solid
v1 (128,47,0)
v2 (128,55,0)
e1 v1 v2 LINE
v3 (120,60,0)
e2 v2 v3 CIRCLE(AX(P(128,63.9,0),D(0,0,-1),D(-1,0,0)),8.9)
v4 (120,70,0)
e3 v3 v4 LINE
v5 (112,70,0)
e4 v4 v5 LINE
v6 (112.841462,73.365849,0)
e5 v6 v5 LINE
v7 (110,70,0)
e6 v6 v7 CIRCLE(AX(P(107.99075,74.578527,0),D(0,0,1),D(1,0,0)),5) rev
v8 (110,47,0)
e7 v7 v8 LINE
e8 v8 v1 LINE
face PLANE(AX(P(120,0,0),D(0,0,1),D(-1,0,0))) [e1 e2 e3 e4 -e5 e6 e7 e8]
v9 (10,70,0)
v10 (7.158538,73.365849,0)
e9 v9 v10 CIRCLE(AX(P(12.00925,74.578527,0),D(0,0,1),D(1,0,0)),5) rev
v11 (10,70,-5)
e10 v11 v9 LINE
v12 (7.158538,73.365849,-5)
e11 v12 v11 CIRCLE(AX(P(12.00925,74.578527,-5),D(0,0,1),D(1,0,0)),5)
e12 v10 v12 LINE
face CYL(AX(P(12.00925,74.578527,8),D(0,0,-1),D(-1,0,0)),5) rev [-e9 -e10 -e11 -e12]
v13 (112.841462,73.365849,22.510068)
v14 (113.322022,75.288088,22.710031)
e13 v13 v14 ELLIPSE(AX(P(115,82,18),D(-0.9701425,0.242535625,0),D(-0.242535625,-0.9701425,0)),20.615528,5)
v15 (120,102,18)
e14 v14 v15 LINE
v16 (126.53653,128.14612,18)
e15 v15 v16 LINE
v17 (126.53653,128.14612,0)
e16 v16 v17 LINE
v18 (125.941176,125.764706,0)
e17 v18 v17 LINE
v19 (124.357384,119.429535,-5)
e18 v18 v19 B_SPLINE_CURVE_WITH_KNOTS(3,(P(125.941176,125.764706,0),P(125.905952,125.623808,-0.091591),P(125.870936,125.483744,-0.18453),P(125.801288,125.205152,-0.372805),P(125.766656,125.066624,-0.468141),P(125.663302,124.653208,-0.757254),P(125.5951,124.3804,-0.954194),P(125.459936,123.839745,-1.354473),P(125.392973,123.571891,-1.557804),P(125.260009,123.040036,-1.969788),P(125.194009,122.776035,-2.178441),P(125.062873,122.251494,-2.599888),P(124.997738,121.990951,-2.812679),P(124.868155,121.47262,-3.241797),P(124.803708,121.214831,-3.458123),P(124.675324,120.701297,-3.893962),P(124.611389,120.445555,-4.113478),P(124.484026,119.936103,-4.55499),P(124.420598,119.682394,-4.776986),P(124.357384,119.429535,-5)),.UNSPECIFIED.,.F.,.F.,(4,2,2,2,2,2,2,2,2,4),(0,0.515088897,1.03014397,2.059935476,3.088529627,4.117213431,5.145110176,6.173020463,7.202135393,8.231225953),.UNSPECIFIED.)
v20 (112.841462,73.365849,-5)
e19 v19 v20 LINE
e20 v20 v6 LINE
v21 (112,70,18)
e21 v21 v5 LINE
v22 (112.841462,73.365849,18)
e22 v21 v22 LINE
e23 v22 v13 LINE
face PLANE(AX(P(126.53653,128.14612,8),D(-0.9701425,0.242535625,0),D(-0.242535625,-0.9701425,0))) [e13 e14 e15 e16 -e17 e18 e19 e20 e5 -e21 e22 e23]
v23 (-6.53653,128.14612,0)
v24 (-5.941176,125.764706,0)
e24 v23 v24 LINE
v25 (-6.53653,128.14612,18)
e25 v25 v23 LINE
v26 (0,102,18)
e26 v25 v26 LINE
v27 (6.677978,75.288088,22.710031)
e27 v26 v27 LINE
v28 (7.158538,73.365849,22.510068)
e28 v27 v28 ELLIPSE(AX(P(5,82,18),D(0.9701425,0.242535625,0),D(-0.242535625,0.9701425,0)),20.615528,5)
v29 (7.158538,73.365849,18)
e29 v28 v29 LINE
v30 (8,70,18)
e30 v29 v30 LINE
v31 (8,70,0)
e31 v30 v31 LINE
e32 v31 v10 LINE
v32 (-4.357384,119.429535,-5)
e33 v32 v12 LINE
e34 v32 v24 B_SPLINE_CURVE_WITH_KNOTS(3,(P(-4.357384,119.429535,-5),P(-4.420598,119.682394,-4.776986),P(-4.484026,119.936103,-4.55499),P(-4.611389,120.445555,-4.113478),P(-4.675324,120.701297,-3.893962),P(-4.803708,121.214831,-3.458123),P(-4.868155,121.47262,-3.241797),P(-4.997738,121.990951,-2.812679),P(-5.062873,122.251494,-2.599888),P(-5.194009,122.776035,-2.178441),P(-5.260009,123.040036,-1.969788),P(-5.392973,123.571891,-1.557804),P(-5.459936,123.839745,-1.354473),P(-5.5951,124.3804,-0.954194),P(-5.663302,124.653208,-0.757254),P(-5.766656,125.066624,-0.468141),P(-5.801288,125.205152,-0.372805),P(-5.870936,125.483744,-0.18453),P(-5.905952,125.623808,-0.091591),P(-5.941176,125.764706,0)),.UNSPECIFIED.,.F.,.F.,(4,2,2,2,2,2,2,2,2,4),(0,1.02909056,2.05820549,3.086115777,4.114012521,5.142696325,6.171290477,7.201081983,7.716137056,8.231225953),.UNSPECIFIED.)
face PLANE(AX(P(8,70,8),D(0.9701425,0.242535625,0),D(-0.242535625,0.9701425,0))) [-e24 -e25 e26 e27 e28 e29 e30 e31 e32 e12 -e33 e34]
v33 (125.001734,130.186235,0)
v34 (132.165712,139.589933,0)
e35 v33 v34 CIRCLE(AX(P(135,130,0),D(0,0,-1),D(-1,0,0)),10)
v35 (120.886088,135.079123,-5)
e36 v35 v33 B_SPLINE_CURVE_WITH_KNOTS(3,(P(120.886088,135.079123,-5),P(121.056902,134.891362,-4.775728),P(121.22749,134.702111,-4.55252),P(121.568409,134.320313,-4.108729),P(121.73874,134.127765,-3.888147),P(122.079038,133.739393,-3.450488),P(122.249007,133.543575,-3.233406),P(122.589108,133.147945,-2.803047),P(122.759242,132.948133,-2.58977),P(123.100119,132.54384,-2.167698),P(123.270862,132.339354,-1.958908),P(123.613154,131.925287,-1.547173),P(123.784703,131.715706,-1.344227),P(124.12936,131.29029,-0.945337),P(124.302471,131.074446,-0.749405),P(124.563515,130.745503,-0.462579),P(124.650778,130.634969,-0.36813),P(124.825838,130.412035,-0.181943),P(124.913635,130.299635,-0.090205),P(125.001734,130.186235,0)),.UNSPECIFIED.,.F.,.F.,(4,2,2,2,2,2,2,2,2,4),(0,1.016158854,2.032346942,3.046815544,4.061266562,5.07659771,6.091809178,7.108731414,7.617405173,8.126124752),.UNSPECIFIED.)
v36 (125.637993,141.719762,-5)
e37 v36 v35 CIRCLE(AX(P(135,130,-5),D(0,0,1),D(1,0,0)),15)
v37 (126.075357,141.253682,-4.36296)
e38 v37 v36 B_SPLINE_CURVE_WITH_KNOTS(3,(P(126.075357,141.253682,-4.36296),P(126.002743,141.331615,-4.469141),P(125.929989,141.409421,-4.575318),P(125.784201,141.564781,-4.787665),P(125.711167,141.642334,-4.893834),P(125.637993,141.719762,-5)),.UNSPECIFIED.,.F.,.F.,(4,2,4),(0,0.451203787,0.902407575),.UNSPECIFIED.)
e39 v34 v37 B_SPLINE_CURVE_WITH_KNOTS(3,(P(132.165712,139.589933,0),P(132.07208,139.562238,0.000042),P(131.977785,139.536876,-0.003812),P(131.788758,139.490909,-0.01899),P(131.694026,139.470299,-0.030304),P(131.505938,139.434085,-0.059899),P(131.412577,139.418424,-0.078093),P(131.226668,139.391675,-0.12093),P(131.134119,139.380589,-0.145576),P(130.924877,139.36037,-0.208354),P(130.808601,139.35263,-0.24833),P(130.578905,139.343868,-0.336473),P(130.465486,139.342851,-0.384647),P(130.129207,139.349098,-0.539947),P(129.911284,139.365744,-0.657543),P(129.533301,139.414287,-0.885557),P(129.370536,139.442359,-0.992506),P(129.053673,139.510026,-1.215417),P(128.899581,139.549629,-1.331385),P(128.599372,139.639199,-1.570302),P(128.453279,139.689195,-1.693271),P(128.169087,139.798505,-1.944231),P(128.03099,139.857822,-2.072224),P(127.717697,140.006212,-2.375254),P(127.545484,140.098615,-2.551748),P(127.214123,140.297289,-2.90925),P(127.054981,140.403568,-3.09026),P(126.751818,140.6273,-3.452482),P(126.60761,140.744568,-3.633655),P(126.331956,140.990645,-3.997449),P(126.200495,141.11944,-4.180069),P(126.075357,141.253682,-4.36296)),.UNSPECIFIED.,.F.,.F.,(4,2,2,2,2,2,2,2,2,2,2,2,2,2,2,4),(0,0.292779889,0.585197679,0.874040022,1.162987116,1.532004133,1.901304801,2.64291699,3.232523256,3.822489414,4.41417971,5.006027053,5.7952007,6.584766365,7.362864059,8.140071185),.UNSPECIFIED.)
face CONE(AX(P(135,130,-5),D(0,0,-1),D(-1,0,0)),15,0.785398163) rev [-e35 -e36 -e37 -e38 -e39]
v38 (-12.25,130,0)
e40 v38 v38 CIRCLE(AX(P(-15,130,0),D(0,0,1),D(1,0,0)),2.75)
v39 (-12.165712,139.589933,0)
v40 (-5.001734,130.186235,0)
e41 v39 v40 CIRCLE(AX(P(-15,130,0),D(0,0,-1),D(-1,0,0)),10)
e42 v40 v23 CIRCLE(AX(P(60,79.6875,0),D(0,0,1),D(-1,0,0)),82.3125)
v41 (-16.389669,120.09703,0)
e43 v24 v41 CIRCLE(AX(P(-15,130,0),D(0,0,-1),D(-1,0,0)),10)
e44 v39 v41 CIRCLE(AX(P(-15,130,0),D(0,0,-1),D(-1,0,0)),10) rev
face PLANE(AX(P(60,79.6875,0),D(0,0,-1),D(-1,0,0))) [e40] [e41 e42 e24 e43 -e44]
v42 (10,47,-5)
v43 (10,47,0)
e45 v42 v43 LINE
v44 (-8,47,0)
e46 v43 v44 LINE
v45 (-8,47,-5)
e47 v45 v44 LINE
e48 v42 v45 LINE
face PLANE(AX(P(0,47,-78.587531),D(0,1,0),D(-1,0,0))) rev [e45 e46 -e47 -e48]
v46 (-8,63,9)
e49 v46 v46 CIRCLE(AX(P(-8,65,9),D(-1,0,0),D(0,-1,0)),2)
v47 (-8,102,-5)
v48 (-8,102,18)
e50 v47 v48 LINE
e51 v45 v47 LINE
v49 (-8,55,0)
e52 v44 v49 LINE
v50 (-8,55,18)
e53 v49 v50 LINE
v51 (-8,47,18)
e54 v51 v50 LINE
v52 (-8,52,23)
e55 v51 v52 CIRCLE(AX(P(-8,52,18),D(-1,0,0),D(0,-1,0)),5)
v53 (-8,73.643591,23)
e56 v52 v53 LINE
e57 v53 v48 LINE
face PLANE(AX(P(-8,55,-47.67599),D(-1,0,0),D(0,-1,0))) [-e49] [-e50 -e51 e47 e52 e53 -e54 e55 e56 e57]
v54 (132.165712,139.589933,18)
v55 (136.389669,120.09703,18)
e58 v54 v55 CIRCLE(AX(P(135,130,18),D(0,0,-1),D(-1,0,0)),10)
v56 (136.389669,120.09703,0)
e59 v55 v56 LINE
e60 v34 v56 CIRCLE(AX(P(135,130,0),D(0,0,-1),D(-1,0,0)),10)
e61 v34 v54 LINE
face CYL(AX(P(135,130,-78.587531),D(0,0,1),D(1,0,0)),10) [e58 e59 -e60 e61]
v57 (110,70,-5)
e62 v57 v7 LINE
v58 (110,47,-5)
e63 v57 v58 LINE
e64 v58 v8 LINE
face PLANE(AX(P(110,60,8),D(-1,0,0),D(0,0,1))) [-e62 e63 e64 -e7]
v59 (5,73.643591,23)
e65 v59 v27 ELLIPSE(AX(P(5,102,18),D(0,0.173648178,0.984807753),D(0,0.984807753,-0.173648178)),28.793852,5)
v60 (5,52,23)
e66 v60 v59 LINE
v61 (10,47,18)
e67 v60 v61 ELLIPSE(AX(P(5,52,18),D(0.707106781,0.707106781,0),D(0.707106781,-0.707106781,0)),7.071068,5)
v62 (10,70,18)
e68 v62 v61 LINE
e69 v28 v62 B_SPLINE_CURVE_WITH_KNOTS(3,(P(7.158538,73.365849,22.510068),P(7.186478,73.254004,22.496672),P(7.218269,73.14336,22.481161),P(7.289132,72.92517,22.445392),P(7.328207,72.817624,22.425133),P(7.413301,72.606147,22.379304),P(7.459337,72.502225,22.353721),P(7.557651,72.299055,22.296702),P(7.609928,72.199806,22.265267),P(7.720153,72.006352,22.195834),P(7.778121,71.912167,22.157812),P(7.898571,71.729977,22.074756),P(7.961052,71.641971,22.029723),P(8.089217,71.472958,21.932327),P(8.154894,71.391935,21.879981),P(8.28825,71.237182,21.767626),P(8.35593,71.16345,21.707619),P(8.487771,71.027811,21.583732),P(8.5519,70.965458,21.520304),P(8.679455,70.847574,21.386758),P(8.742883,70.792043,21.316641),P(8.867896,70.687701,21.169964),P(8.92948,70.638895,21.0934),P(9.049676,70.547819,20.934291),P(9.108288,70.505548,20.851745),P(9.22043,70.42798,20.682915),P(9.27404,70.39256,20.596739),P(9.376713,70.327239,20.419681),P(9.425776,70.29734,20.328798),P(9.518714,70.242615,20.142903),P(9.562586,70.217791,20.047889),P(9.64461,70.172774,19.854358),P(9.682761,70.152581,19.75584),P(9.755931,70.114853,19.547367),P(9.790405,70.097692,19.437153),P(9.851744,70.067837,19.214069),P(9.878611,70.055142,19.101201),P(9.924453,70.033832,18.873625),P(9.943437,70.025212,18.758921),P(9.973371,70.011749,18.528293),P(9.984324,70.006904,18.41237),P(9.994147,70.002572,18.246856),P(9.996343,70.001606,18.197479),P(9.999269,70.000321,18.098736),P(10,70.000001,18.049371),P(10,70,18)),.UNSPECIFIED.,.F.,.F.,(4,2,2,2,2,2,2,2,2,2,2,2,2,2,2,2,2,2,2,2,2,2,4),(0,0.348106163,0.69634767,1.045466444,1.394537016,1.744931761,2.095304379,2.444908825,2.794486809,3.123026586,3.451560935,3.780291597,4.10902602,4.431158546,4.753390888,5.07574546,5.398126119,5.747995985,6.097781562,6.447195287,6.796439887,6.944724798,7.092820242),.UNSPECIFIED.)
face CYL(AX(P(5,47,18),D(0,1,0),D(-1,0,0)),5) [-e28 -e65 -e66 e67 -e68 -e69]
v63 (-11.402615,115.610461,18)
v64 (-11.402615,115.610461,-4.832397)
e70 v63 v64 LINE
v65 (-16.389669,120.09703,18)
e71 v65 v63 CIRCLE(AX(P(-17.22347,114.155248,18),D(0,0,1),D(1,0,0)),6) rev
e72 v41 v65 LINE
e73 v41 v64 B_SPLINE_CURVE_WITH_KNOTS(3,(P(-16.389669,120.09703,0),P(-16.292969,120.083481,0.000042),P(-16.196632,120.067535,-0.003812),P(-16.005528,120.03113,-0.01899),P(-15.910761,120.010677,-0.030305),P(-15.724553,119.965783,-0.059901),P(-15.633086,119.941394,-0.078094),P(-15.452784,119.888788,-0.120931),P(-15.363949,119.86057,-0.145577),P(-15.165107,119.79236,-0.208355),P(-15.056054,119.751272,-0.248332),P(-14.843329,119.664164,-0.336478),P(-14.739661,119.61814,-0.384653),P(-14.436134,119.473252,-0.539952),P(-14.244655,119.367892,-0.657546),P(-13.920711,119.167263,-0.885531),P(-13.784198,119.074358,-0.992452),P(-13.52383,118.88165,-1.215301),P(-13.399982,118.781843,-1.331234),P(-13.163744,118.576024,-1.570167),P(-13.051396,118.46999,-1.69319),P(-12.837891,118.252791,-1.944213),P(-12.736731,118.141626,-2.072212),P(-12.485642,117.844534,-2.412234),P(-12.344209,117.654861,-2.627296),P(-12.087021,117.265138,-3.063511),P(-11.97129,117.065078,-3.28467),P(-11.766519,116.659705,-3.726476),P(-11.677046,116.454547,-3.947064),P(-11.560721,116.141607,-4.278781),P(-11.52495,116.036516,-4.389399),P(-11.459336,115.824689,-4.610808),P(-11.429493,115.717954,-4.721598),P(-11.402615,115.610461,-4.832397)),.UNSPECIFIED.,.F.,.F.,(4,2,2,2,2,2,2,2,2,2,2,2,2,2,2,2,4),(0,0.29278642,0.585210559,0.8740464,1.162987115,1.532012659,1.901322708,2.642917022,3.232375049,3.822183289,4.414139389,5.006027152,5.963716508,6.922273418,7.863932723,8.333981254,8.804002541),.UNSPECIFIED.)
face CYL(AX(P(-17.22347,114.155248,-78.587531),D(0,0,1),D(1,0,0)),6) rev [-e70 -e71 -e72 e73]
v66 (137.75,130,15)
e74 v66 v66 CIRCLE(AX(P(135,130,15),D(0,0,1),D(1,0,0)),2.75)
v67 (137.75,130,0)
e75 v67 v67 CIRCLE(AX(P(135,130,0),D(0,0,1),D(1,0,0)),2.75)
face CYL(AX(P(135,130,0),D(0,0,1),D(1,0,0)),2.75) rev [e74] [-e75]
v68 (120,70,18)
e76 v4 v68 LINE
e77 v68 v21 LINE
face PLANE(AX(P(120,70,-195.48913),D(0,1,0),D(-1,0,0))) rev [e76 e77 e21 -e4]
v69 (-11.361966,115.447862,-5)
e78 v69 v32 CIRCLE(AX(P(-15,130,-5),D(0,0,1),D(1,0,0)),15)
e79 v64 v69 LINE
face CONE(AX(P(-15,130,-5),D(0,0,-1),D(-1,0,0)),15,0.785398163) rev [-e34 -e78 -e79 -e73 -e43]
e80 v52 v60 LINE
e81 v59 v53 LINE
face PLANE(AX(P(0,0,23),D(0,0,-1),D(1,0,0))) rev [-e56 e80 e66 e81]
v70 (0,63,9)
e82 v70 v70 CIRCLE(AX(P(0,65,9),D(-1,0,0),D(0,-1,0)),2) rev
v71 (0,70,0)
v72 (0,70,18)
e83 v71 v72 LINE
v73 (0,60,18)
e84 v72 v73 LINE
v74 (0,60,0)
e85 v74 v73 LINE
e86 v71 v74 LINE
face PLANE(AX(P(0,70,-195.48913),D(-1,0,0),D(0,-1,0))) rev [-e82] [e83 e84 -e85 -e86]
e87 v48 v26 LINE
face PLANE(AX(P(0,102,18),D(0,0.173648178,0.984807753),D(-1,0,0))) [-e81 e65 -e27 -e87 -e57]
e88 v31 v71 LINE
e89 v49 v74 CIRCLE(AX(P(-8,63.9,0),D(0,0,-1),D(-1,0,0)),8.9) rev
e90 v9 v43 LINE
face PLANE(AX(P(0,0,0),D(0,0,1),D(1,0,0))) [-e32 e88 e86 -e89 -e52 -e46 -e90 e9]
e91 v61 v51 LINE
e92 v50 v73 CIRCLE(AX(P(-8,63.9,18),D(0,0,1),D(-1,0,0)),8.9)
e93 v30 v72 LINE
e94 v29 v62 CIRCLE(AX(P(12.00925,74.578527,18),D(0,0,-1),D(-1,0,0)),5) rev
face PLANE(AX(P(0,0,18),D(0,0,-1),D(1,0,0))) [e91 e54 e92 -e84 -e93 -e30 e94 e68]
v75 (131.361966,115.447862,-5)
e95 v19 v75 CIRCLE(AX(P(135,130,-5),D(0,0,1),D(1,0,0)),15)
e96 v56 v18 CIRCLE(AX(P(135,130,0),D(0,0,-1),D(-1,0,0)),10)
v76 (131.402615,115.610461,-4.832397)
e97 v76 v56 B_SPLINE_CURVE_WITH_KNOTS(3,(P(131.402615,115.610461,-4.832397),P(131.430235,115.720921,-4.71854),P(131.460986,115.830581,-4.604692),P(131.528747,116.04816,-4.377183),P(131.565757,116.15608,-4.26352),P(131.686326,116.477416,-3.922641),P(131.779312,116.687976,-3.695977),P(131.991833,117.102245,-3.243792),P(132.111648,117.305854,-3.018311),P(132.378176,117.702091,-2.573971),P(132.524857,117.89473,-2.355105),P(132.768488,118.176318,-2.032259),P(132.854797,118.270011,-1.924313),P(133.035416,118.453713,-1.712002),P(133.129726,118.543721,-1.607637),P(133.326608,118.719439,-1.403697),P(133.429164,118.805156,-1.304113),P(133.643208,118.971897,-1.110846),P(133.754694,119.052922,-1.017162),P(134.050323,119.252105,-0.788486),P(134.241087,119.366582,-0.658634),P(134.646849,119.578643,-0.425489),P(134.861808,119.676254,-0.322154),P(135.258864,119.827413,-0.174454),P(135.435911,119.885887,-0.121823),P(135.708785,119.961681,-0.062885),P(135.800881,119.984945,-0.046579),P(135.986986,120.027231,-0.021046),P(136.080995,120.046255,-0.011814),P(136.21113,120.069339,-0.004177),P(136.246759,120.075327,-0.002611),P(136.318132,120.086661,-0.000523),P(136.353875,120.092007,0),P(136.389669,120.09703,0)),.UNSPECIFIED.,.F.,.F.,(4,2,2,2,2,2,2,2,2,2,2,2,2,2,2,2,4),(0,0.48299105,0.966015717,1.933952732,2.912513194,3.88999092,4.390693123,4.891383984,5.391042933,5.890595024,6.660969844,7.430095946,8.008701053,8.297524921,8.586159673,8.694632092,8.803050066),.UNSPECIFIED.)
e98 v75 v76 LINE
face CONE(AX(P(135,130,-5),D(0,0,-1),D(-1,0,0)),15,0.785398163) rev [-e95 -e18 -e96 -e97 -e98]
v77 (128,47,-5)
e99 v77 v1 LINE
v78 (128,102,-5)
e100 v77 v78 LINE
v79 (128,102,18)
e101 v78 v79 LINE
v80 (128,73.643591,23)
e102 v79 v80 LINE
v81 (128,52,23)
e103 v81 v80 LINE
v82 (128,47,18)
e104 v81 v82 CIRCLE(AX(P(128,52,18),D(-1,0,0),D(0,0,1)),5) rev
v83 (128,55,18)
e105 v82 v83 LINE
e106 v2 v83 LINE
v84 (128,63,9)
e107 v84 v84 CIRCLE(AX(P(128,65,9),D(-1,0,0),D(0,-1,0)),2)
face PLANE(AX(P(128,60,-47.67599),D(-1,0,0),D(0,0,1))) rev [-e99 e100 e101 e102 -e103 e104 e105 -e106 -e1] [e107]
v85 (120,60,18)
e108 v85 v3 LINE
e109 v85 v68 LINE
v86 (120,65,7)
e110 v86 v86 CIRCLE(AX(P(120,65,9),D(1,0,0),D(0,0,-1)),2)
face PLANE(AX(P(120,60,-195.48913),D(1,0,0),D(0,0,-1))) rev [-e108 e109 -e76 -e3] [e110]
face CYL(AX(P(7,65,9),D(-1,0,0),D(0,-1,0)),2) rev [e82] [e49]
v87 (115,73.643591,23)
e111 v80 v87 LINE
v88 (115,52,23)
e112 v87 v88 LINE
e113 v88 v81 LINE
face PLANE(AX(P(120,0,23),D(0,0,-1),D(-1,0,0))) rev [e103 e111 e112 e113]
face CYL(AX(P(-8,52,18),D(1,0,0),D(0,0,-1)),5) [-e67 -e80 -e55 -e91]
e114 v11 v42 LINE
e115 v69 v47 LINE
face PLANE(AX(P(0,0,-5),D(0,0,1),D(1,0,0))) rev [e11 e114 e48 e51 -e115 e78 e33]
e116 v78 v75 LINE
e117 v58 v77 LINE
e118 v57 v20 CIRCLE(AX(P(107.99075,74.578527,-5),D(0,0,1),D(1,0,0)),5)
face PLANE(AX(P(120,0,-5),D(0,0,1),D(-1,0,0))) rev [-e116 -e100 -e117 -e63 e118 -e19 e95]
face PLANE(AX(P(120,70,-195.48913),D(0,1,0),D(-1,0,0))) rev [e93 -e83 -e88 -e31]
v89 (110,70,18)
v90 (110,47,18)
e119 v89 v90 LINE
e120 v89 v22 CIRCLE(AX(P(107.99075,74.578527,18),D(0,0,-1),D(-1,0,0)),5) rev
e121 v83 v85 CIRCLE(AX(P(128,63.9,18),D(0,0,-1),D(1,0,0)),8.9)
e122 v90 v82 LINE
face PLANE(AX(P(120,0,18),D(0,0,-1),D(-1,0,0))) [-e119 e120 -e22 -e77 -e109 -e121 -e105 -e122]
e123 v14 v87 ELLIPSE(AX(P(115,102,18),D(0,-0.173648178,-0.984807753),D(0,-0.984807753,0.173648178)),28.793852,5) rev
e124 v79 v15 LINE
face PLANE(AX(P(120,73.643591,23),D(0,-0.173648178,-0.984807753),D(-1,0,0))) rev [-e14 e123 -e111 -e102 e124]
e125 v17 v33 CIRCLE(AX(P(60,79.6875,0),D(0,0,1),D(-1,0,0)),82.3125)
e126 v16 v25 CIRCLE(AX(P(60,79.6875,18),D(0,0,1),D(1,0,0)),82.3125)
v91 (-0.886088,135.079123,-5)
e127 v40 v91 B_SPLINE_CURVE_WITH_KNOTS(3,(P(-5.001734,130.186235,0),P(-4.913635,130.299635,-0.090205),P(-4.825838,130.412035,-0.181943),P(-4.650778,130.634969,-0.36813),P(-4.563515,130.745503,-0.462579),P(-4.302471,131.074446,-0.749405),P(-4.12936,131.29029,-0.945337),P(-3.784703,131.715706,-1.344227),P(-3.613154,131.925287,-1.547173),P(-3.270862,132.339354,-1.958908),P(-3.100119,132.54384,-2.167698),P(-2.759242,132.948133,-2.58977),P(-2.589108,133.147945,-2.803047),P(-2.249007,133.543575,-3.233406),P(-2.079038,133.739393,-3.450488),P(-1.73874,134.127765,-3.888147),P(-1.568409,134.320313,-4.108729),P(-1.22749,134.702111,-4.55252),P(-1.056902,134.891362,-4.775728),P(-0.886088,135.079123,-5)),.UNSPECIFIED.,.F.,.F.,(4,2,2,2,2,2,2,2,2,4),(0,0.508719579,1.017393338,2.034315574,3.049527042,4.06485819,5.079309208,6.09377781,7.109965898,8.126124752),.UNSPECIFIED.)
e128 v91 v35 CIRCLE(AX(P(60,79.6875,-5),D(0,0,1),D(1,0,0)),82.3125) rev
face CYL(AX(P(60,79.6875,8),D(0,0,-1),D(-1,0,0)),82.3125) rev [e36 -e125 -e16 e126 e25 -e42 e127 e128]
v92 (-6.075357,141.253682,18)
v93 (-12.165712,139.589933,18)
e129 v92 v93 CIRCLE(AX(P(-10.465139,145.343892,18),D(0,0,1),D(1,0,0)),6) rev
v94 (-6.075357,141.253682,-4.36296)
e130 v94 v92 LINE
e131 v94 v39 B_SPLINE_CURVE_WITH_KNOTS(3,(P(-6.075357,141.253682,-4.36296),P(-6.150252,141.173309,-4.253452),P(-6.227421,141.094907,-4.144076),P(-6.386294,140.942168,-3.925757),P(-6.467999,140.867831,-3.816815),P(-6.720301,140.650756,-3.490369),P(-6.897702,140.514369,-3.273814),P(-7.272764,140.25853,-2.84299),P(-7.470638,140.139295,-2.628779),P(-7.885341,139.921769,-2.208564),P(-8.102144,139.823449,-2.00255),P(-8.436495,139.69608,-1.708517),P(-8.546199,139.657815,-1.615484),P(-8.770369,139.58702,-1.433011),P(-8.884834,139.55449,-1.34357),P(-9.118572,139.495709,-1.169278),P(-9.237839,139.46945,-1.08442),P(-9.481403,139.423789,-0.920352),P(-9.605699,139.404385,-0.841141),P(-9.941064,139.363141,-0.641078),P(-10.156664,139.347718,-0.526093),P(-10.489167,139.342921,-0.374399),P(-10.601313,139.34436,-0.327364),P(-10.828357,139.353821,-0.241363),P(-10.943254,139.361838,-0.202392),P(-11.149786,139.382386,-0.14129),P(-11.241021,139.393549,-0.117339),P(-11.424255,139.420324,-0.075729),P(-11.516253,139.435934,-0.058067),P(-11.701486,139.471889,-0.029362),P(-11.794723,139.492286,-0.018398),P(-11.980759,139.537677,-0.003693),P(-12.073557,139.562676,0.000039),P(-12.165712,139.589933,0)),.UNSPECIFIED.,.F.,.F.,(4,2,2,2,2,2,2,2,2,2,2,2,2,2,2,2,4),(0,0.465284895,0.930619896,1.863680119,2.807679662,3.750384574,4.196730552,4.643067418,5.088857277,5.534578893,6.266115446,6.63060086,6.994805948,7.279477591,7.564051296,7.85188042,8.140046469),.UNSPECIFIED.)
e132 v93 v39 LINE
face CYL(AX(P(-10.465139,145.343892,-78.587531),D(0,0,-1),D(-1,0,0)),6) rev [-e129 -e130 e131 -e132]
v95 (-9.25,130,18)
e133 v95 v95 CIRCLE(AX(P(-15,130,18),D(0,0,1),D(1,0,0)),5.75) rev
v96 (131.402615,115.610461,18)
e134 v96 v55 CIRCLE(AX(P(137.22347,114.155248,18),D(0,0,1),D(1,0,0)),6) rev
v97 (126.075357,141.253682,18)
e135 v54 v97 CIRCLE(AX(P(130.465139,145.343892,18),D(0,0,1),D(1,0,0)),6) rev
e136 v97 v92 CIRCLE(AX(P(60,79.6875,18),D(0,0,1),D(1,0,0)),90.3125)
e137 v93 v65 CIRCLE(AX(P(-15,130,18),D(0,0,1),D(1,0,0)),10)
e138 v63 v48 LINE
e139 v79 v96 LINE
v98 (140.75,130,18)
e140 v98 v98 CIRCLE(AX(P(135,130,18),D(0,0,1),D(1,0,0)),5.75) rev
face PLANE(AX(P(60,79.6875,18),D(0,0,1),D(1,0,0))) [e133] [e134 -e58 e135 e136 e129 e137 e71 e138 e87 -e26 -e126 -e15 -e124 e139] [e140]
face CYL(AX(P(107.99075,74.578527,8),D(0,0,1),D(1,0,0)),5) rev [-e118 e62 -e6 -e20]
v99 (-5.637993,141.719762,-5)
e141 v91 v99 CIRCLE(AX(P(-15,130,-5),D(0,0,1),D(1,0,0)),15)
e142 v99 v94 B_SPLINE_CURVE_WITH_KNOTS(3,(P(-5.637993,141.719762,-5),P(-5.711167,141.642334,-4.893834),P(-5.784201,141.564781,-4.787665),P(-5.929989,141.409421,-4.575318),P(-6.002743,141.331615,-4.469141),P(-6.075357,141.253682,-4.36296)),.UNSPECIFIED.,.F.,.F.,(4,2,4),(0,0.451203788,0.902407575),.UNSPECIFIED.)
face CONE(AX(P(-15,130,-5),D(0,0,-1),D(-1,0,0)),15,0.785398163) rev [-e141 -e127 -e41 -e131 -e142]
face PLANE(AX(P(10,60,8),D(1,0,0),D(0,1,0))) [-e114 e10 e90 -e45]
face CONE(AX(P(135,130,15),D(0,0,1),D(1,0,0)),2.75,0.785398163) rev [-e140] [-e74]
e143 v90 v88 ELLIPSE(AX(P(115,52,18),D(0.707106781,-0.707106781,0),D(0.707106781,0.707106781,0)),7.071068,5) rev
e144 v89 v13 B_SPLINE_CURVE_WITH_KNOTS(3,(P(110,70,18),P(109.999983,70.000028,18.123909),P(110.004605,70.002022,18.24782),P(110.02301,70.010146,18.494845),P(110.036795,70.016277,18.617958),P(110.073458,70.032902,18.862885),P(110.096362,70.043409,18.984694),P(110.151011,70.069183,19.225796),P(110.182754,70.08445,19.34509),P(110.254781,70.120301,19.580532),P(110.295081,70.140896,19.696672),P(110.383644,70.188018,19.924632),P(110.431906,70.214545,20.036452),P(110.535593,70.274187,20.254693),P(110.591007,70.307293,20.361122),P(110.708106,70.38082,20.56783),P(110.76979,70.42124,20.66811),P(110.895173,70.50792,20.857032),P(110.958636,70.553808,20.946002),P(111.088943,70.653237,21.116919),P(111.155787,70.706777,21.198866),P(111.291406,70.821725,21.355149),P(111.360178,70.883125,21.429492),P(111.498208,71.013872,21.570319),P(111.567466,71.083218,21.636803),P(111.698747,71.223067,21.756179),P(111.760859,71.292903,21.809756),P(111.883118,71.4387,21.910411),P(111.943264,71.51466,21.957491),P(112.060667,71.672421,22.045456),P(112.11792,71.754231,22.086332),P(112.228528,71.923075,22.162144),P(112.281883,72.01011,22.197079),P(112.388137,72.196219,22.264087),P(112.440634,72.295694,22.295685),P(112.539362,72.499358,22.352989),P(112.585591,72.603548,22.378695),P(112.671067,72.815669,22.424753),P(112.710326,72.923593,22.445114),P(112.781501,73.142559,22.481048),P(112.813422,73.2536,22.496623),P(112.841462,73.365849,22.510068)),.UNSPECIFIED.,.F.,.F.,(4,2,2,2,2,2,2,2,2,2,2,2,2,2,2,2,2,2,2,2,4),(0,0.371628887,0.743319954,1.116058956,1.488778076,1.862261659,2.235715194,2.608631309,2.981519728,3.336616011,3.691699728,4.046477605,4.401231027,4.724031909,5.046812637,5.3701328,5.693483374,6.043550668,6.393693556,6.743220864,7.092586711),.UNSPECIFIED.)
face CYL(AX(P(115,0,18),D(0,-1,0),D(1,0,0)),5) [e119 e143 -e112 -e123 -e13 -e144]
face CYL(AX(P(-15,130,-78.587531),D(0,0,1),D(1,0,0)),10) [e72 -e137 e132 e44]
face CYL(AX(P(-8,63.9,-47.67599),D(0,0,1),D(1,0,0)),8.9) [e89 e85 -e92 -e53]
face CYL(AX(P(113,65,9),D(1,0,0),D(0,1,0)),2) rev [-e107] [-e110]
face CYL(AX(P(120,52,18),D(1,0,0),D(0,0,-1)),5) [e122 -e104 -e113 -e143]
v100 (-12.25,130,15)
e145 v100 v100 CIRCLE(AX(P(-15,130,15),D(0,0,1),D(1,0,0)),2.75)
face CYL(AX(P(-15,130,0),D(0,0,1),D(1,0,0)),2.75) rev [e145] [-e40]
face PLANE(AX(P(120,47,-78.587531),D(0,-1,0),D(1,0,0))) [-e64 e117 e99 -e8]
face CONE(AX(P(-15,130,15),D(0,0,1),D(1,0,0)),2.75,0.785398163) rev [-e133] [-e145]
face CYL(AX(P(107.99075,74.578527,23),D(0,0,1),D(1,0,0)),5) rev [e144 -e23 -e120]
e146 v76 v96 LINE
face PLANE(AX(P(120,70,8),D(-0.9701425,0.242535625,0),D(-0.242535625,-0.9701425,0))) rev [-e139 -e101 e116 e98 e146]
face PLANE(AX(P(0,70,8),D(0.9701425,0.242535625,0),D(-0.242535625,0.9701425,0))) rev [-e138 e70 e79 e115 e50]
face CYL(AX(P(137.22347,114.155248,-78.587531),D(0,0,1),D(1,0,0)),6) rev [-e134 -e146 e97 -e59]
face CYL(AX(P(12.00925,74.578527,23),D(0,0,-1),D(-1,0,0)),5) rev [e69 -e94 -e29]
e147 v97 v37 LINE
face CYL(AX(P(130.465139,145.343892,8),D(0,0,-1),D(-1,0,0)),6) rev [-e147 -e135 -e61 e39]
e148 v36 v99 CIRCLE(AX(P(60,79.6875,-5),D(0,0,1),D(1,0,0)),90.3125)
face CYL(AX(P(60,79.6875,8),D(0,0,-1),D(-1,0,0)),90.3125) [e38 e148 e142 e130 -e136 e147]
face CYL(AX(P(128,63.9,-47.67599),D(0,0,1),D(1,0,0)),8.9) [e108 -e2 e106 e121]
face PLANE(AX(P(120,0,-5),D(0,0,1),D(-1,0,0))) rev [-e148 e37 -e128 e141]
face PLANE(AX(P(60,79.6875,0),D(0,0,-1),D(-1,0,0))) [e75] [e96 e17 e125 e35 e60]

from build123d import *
from OCP.BRepFilletAPI import BRepFilletAPI_MakeChamfer

# Parameters (mm, degrees)
ESQUISSE1_W             = 100
ESQUISSE1_H             = 10
BOSS_EXTRU_1_DEPTH      = 8
ESQUISSE2_W             = 100
ESQUISSE2_H             = 47.5
BOSS_EXTRU_2_DEPTH      = 10
BOSS_EXTRU_3_START      = -18
ESQUISSE3_R             = 2.75
BOSS_EXTRU_3_DEPTH      = 18
CONG_1_R                = 6
ESQUISSE5_W             = 100
ESQUISSE5_H             = 47.5
ENL_V_MAT_EXTRU_2_DEPTH = 3
ESQUISSE6_R             = 2.75
ENL_V_MAT_EXTRU_3_DEPTH = 225.162887353
ESQUISSE7_W             = 60
ESQUISSE7_H             = 60
BOSS_EXTRU_4_DEPTH      = 5
CONG_2_R                = 10
CHANFREIN2_SIZE         = 3
ESQUISSE8_R             = 1.5
ENL_V_MAT_EXTRU_4_DEPTH = 224.81688959
BOSS_EXTRUDE1_DEPTH     = 18
BOSS_EXTRUDE2_DEPTH     = 5
SKETCH6_R               = 2
CUT_EXTRUDE3_DEPTH      = 15
CUT_EXTRUDE2_DEPTH      = 18
MIRROR4_COPY_1_DEPTH    = 5
BOSS_EXTRUDE3_START     = 5
BOSS_EXTRUDE3_DEPTH     = 5
CHAMFER1_SIZE           = 28.356409098
CHAMFER1_SIZE_2         = 5
CHAMFER2_SIZE           = 5
FILLET2_R               = 5
FILLET1_R               = 5


# Some blends are built 0.0001 mm under size
with BuildPart() as part:
    # Esquisse1 → Boss.-Extru.1 (new body)
    with BuildSketch(Plane.XY):
        with BuildLine():
            Line((0, 0), (120, 0))
            Line((120, 0), (120, 70))
            Line((120, 70), (135, 130))
            ThreePointArc((135, 130), (60, 170), (-15, 130))
            Line((-15, 130), (0, 70))
            Line((0, 70), (0, 0))
        make_face()
        with Locations((60, 55)):
            Rectangle(ESQUISSE1_W, ESQUISSE1_H, mode=Mode.SUBTRACT)
        with Locations((60, 29.5)):
            Rectangle(ESQUISSE1_W, ESQUISSE1_H, mode=Mode.SUBTRACT)
        with BuildLine():
            Line((8, 70), (-6.536529961, 128.146119843))
            ThreePointArc((-6.536529961, 128.146119843), (60, 162), (126.536529961, 128.146119843))
            Line((126.536529961, 128.146119843), (112, 70))
            Line((112, 70), (8, 70))
        make_face(mode=Mode.SUBTRACT)
    extrude(amount=BOSS_EXTRU_1_DEPTH)

    # Esquisse2 → Boss.-Extru.2 (add)
    with BuildSketch(Plane.XY.offset(8)):
        with BuildLine():
            Line((0, 70), (0, 0))
            Line((0, 0), (120, 0))
            Line((120, 0), (120, 70))
            Line((120, 70), (135, 130))
            ThreePointArc((135, 130), (60, 170), (-15, 130))
            Line((-15, 130), (0, 70))
        make_face()
        with Locations((60, 42.25)):
            Rectangle(ESQUISSE2_W, ESQUISSE2_H, mode=Mode.SUBTRACT)
        with BuildLine():
            Line((112, 70), (126.536529961, 128.146119843))
            ThreePointArc((126.536529961, 128.146119843), (60, 162), (-6.536529961, 128.146119843))
            Line((-6.536529961, 128.146119843), (8, 70))
            Line((8, 70), (112, 70))
        make_face(mode=Mode.SUBTRACT)
    extrude(amount=BOSS_EXTRU_2_DEPTH)

    # Esquisse3 → Boss.-Extru.3 (add)
    # profile 1 of 2: a face of its own
    with BuildSketch(Plane.XY.offset(18).offset(BOSS_EXTRU_3_START)):
        with BuildLine():
            Line((0, 47), (0, 54))
            Line((0, 54), (-13, 54))
            Line((-13, 54), (-13, -12))
            ThreePointArc((-13, -12), (-3, -22), (7, -12))
            Line((7, -12), (7, 0))
            Line((7, 0), (0, 0))
            Line((0, 0), (0, 7))
            Line((0, 7), (-6, 7))
            Line((-6, 7), (-6, 47))
            Line((-6, 47), (0, 47))
        make_face()
        with Locations((-3, -12)):
            Circle(ESQUISSE3_R, mode=Mode.SUBTRACT)
    # profile 2 of 2: a face of its own
    with BuildSketch(Plane.XY.offset(18).offset(BOSS_EXTRU_3_START)):
        with BuildLine():
            Line((-5.941176471, 125.764705882), (-6.536529961, 128.146119843))
            ThreePointArc((-6.536529961, 128.146119843), (-5.777042038, 129.172127886), (-5.001734316, 130.18623456))
            ThreePointArc((-5.001734316, 130.18623456), (-24.781648189, 132.078306694), (-5.941176471, 125.764705882))
        make_face()
    boss_extru_3 = extrude(amount=BOSS_EXTRU_3_DEPTH)

    # Symétrie1: Boss.-Extru.3 across plane
    add(boss_extru_3.mirror(Plane.ZY.offset(-60)))

    # Congé1
    cong_1_edges = [part.edges().sort_by_distance(p)[0] for p in [
        (7, 0, 9),
        (0, 54, 9),
        (-13, 54, 9),
        (-8.977845414, 137.983336029, 9),
        (-12.57464375, 120.298574999, 9),
        (133, 54, 9),
        (113, 0, 9),
        (120, 54, 9),
        (132.57464375, 120.298574999, 9),
        (128.977845414, 137.983336029, 9),
    ]]
    fillet(cong_1_edges, radius=CONG_1_R)

    # Esquisse5 → Enlèv. mat.-Extru.2 (cut)
    with BuildSketch(Plane.XY.offset(8)):
        with Locations((60, 42.25)):
            Rectangle(ESQUISSE5_W, ESQUISSE5_H)
    extrude(amount=-ENL_V_MAT_EXTRU_2_DEPTH, mode=Mode.SUBTRACT)

    # Esquisse6 → Enlèv. mat.-Extru.3 (cut, through all)
    with BuildSketch(Plane.XY.offset(18)):
        with Locations((-15, 130)):
            Circle(ESQUISSE6_R)
        with Locations((135, 130)):
            Circle(ESQUISSE6_R)
    extrude(amount=-ENL_V_MAT_EXTRU_3_DEPTH, mode=Mode.SUBTRACT)

    # Esquisse7 → Boss.-Extru.4 (add)
    with BuildSketch(Plane(origin=(0, 0, 0), x_dir=(-1, 0, 0), z_dir=(0, 0, -1))):
        with Locations((-60, -30)):
            Rectangle(ESQUISSE7_W, ESQUISSE7_H)
    extrude(amount=-BOSS_EXTRU_4_DEPTH)

    # Congé2
    cong_2_edges = [part.edges().sort_by_distance(p)[0] for p in [
        (60, 0, 5),
        (90, 0, 2.5),
        (30, 0, 2.5),
    ]]
    fillet(cong_2_edges, radius=CONG_2_R)

    # Chanfrein2
    chanfrein2_edges = [part.edges().sort_by_distance(p)[0] for p in [
        (-5.75, -12, 18),
        (125.75, -12, 18),
        (-17.75, 130, 18),
        (132.25, 130, 18),
    ]]
    chamfer(chanfrein2_edges, length=CHANFREIN2_SIZE)

    # Esquisse8 → Enlèv. mat.-Extru.4 (cut, through all)
    with BuildSketch(Plane.XY.offset(5)):
        with Locations((40, -43.333333333)):
            Circle(ESQUISSE8_R)
        with Locations((40, -26.666666667)):
            Circle(ESQUISSE8_R)
        with Locations((60, -26.666666667)):
            Circle(ESQUISSE8_R)
        with Locations((60, -43.333333333)):
            Circle(ESQUISSE8_R)
        with Locations((80, -26.666666667)):
            Circle(ESQUISSE8_R)
        with Locations((80, -43.333333333)):
            Circle(ESQUISSE8_R)
    extrude(amount=-ENL_V_MAT_EXTRU_4_DEPTH, mode=Mode.SUBTRACT)

    # Sketch2 → Boss-Extrude1 (add)
    with BuildSketch(Plane.XY.offset(18)):
        with BuildLine():
            Line((-8, 60), (-8, 102))
            Line((-8, 102), (0, 70))
            Line((0, 70), (0, 60))
            ThreePointArc((0, 60), (-3.283009434, 56.352815094), (-8, 55))
            Line((-8, 55), (-8, 60))
        make_face()
    boss_extrude1 = extrude(amount=-BOSS_EXTRUDE1_DEPTH)

    # Sketch3 → Boss-Extrude2 (add)
    with BuildSketch(Plane(origin=(0, 0, 0), x_dir=(-1, 0, 0), z_dir=(0, 0, -1))):
        Polygon((8, 102), (8, 47), (-10, 47), (-10, 70), (-8, 70), (0, 102), align=None)
    boss_extrude2 = extrude(amount=BOSS_EXTRUDE2_DEPTH)

    # Sketch6 → Cut-Extrude3 (cut)
    with BuildSketch(Plane.ZY.offset(8)):
        with Locations(Location((9, 65, 0), (0, 0, 270))):
            Circle(SKETCH6_R)
    cut_extrude3 = extrude(amount=-CUT_EXTRUDE3_DEPTH, mode=Mode.SUBTRACT)

    # Mirror1: Boss-Extrude1, Cut-Extrude3 across plane
    add(boss_extrude1.mirror(Plane.ZY.offset(-60)))
    add(cut_extrude3.mirror(Plane.ZY.offset(-60)), mode=Mode.SUBTRACT)

    # Mirror3: Boss-Extrude2 across plane
    add(boss_extrude2.mirror(Plane.ZY.offset(-60)))

    # Sketch4 → Cut-Extrude2 (cut)
    with BuildSketch(Plane.XY.offset(18)):
        with BuildLine():
            Line((120, 70), (0, 70))
            Line((0, 70), (0, 60))
            ThreePointArc((0, 60), (-1.757359313, 55.757359313), (-6, 54))
            Line((-6, 54), (-7, 54))
            ThreePointArc((-7, 54), (-11.242640687, 52.242640687), (-13, 48))
            Line((-13, 48), (-13, -60))
            Line((-13, -60), (133, -60))
            Line((133, -60), (133, 48))
            ThreePointArc((133, 48), (131.242640687, 52.242640687), (127, 54))
            Line((127, 54), (126, 54))
            ThreePointArc((126, 54), (121.757359313, 55.757359313), (120, 60))
            Line((120, 60), (120, 70))
        make_face()
    extrude(amount=-CUT_EXTRUDE2_DEPTH, mode=Mode.SUBTRACT)

    # Mirror4: Boss-Extrude2 across plane
    add(boss_extrude2.mirror(Plane.XY.offset(9)))

    # Mirror4 copy 1 sketch → Mirror4 copy 1 (add)
    with BuildSketch(Plane(origin=(120, 0, 18), x_dir=(1, 0, 0), z_dir=(0, 0, 1))):
        Polygon((8, 102), (8, 47), (-10, 47), (-10, 70), (-8, 70), (0, 102), align=None)
    extrude(amount=MIRROR4_COPY_1_DEPTH)

    # Sketch5 → Boss-Extrude3 (add)
    with BuildSketch(Plane(origin=(0, 0, 0), x_dir=(-1, 0, 0), z_dir=(0, 0, -1)).offset(BOSS_EXTRUDE3_START)):
        with BuildLine():
            Line((-131.402615329, 115.610461316), (-128, 102))
            Line((-128, 102), (-120, 102))
            Line((-120, 102), (-125.941176471, 125.764705882))
            ThreePointArc((-125.941176471, 125.764705882), (-130.2319164, 121.209927259), (-136.389668956, 120.097029729))
            ThreePointArc((-136.389668956, 120.097029729), (-133.210561548, 118.615803933), (-131.402615329, 115.610461316))
        make_face()
        with BuildLine():
            ThreePointArc((-126.075357318, 141.25368237), (-128.884007473, 139.55597192), (-132.165711776, 139.589932756))
            ThreePointArc((-132.165711776, 139.589932756), (-127.045379023, 136.060033425), (-125.001734316, 130.18623456))
            ThreePointArc((-125.001734316, 130.18623456), (-60, 162), (5.001734316, 130.18623456))
            ThreePointArc((5.001734316, 130.18623456), (7.045379023, 136.060033425), (12.165711776, 139.589932756))
            ThreePointArc((12.165711776, 139.589932756), (8.884007473, 139.55597192), (6.075357318, 141.25368237))
            ThreePointArc((6.075357318, 141.25368237), (-60, 170), (-126.075357318, 141.25368237))
        make_face()
        with BuildLine():
            ThreePointArc((16.389668956, 120.097029729), (10.2319164, 121.209927259), (5.941176471, 125.764705882))
            Line((5.941176471, 125.764705882), (0, 102))
            Line((0, 102), (8, 102))
            Line((8, 102), (11.402615329, 115.610461316))
            ThreePointArc((11.402615329, 115.610461316), (13.210561548, 118.615803933), (16.389668956, 120.097029729))
        make_face()
    extrude(amount=-BOSS_EXTRUDE3_DEPTH)

    # Chamfer1
    chamfer1_edges_1 = [part.edges().sort_by_distance(p)[0] for p in [
        (124, 102, 23),
    ]]
    chamfer1_side_1 = [part.faces().sort_by_distance(p)[0] for p in [
        (124, 101.9, 23),
    ]]
    chamfer1_edges_2 = [part.edges().sort_by_distance(p)[0] for p in [
        (-4, 102, 23),
    ]]
    chamfer1_side_2 = [part.faces().sort_by_distance(p)[0] for p in [
        (-4, 102, 22.9),
    ]]
    chamfer1 = BRepFilletAPI_MakeChamfer(part.part.solid().wrapped)
    for e in chamfer1_edges_1:
        chamfer1.Add(CHAMFER1_SIZE - 0.0001, CHAMFER1_SIZE_2 - 0.0001, e.wrapped, chamfer1_side_1[0].wrapped)
    for e in chamfer1_edges_2:
        chamfer1.Add(CHAMFER1_SIZE_2 - 0.0001, CHAMFER1_SIZE - 0.0001, e.wrapped, chamfer1_side_2[0].wrapped)
    add(Compound.cast(chamfer1.Shape()), mode=Mode.REPLACE)  # a hair under: the kernel refuses the full size

    # Chamfer2
    chamfer2_edges = [part.edges().sort_by_distance(p)[0] for p in [
        (130.2319164, 121.209927259, -5),
        (-7.045379023, 136.060033425, -5),
        (127.045379023, 136.060033425, -5),
        (-10.2319164, 121.209927259, -5),
    ]]
    chamfer(chamfer2_edges, length=CHAMFER2_SIZE - 0.0001)  # a hair under: the kernel refuses the full size

    # Fillet2
    # the kernel refuses this fillet: 5 mm, written as the material it adds along each edge
    with BuildSketch(Plane(origin=(8, 70, -5), x_dir=(-0.2425356250363325, 0.970142500145332, 0), z_dir=(0, 0, 1)), Plane(origin=(8, 70, 18), x_dir=(-0.2425356250363325, 0.970142500145332, 0), z_dir=(0, 0, 1))) as fillet2_piece_1:
        with BuildLine():
            CenterArc((3.46943809, -5), FILLET2_R, 90, 52.269872505)
            Line((-0.48507125, -1.940285), (0, 0))
            Line((0, 0), (3.46943809, 0))
        make_face()
    extrude(amount=5)
    with BuildSketch(Plane(origin=(112, 70, -5), x_dir=(0.2425356250363291, 0.9701425001453328, 0), z_dir=(0, 0, 1)), Plane(origin=(112, 70, 18), x_dir=(0.2425356250363291, 0.9701425001453328, 0), z_dir=(0, 0, 1))) as fillet2_piece_2:
        with BuildLine():
            CenterArc((3.46943809, 5), FILLET2_R, 217.730127495, 52.269872505)
            Line((-0.48507125, 1.940285), (0, 0))
            Line((0, 0), (3.46943809, 0))
        make_face()
    extrude(amount=5)

    # Fillet1
    fillet1_edges = [part.edges().sort_by_distance(p)[0] for p in [
        (110, 58.5, 23),
        (10, 58.5, 23),
        (1, 47, 23),
        (119, 47, 23),
    ]]
    fillet(fillet1_edges, radius=FILLET1_R - 0.0001)  # a hair under: the kernel refuses the full size


solid = part.part
